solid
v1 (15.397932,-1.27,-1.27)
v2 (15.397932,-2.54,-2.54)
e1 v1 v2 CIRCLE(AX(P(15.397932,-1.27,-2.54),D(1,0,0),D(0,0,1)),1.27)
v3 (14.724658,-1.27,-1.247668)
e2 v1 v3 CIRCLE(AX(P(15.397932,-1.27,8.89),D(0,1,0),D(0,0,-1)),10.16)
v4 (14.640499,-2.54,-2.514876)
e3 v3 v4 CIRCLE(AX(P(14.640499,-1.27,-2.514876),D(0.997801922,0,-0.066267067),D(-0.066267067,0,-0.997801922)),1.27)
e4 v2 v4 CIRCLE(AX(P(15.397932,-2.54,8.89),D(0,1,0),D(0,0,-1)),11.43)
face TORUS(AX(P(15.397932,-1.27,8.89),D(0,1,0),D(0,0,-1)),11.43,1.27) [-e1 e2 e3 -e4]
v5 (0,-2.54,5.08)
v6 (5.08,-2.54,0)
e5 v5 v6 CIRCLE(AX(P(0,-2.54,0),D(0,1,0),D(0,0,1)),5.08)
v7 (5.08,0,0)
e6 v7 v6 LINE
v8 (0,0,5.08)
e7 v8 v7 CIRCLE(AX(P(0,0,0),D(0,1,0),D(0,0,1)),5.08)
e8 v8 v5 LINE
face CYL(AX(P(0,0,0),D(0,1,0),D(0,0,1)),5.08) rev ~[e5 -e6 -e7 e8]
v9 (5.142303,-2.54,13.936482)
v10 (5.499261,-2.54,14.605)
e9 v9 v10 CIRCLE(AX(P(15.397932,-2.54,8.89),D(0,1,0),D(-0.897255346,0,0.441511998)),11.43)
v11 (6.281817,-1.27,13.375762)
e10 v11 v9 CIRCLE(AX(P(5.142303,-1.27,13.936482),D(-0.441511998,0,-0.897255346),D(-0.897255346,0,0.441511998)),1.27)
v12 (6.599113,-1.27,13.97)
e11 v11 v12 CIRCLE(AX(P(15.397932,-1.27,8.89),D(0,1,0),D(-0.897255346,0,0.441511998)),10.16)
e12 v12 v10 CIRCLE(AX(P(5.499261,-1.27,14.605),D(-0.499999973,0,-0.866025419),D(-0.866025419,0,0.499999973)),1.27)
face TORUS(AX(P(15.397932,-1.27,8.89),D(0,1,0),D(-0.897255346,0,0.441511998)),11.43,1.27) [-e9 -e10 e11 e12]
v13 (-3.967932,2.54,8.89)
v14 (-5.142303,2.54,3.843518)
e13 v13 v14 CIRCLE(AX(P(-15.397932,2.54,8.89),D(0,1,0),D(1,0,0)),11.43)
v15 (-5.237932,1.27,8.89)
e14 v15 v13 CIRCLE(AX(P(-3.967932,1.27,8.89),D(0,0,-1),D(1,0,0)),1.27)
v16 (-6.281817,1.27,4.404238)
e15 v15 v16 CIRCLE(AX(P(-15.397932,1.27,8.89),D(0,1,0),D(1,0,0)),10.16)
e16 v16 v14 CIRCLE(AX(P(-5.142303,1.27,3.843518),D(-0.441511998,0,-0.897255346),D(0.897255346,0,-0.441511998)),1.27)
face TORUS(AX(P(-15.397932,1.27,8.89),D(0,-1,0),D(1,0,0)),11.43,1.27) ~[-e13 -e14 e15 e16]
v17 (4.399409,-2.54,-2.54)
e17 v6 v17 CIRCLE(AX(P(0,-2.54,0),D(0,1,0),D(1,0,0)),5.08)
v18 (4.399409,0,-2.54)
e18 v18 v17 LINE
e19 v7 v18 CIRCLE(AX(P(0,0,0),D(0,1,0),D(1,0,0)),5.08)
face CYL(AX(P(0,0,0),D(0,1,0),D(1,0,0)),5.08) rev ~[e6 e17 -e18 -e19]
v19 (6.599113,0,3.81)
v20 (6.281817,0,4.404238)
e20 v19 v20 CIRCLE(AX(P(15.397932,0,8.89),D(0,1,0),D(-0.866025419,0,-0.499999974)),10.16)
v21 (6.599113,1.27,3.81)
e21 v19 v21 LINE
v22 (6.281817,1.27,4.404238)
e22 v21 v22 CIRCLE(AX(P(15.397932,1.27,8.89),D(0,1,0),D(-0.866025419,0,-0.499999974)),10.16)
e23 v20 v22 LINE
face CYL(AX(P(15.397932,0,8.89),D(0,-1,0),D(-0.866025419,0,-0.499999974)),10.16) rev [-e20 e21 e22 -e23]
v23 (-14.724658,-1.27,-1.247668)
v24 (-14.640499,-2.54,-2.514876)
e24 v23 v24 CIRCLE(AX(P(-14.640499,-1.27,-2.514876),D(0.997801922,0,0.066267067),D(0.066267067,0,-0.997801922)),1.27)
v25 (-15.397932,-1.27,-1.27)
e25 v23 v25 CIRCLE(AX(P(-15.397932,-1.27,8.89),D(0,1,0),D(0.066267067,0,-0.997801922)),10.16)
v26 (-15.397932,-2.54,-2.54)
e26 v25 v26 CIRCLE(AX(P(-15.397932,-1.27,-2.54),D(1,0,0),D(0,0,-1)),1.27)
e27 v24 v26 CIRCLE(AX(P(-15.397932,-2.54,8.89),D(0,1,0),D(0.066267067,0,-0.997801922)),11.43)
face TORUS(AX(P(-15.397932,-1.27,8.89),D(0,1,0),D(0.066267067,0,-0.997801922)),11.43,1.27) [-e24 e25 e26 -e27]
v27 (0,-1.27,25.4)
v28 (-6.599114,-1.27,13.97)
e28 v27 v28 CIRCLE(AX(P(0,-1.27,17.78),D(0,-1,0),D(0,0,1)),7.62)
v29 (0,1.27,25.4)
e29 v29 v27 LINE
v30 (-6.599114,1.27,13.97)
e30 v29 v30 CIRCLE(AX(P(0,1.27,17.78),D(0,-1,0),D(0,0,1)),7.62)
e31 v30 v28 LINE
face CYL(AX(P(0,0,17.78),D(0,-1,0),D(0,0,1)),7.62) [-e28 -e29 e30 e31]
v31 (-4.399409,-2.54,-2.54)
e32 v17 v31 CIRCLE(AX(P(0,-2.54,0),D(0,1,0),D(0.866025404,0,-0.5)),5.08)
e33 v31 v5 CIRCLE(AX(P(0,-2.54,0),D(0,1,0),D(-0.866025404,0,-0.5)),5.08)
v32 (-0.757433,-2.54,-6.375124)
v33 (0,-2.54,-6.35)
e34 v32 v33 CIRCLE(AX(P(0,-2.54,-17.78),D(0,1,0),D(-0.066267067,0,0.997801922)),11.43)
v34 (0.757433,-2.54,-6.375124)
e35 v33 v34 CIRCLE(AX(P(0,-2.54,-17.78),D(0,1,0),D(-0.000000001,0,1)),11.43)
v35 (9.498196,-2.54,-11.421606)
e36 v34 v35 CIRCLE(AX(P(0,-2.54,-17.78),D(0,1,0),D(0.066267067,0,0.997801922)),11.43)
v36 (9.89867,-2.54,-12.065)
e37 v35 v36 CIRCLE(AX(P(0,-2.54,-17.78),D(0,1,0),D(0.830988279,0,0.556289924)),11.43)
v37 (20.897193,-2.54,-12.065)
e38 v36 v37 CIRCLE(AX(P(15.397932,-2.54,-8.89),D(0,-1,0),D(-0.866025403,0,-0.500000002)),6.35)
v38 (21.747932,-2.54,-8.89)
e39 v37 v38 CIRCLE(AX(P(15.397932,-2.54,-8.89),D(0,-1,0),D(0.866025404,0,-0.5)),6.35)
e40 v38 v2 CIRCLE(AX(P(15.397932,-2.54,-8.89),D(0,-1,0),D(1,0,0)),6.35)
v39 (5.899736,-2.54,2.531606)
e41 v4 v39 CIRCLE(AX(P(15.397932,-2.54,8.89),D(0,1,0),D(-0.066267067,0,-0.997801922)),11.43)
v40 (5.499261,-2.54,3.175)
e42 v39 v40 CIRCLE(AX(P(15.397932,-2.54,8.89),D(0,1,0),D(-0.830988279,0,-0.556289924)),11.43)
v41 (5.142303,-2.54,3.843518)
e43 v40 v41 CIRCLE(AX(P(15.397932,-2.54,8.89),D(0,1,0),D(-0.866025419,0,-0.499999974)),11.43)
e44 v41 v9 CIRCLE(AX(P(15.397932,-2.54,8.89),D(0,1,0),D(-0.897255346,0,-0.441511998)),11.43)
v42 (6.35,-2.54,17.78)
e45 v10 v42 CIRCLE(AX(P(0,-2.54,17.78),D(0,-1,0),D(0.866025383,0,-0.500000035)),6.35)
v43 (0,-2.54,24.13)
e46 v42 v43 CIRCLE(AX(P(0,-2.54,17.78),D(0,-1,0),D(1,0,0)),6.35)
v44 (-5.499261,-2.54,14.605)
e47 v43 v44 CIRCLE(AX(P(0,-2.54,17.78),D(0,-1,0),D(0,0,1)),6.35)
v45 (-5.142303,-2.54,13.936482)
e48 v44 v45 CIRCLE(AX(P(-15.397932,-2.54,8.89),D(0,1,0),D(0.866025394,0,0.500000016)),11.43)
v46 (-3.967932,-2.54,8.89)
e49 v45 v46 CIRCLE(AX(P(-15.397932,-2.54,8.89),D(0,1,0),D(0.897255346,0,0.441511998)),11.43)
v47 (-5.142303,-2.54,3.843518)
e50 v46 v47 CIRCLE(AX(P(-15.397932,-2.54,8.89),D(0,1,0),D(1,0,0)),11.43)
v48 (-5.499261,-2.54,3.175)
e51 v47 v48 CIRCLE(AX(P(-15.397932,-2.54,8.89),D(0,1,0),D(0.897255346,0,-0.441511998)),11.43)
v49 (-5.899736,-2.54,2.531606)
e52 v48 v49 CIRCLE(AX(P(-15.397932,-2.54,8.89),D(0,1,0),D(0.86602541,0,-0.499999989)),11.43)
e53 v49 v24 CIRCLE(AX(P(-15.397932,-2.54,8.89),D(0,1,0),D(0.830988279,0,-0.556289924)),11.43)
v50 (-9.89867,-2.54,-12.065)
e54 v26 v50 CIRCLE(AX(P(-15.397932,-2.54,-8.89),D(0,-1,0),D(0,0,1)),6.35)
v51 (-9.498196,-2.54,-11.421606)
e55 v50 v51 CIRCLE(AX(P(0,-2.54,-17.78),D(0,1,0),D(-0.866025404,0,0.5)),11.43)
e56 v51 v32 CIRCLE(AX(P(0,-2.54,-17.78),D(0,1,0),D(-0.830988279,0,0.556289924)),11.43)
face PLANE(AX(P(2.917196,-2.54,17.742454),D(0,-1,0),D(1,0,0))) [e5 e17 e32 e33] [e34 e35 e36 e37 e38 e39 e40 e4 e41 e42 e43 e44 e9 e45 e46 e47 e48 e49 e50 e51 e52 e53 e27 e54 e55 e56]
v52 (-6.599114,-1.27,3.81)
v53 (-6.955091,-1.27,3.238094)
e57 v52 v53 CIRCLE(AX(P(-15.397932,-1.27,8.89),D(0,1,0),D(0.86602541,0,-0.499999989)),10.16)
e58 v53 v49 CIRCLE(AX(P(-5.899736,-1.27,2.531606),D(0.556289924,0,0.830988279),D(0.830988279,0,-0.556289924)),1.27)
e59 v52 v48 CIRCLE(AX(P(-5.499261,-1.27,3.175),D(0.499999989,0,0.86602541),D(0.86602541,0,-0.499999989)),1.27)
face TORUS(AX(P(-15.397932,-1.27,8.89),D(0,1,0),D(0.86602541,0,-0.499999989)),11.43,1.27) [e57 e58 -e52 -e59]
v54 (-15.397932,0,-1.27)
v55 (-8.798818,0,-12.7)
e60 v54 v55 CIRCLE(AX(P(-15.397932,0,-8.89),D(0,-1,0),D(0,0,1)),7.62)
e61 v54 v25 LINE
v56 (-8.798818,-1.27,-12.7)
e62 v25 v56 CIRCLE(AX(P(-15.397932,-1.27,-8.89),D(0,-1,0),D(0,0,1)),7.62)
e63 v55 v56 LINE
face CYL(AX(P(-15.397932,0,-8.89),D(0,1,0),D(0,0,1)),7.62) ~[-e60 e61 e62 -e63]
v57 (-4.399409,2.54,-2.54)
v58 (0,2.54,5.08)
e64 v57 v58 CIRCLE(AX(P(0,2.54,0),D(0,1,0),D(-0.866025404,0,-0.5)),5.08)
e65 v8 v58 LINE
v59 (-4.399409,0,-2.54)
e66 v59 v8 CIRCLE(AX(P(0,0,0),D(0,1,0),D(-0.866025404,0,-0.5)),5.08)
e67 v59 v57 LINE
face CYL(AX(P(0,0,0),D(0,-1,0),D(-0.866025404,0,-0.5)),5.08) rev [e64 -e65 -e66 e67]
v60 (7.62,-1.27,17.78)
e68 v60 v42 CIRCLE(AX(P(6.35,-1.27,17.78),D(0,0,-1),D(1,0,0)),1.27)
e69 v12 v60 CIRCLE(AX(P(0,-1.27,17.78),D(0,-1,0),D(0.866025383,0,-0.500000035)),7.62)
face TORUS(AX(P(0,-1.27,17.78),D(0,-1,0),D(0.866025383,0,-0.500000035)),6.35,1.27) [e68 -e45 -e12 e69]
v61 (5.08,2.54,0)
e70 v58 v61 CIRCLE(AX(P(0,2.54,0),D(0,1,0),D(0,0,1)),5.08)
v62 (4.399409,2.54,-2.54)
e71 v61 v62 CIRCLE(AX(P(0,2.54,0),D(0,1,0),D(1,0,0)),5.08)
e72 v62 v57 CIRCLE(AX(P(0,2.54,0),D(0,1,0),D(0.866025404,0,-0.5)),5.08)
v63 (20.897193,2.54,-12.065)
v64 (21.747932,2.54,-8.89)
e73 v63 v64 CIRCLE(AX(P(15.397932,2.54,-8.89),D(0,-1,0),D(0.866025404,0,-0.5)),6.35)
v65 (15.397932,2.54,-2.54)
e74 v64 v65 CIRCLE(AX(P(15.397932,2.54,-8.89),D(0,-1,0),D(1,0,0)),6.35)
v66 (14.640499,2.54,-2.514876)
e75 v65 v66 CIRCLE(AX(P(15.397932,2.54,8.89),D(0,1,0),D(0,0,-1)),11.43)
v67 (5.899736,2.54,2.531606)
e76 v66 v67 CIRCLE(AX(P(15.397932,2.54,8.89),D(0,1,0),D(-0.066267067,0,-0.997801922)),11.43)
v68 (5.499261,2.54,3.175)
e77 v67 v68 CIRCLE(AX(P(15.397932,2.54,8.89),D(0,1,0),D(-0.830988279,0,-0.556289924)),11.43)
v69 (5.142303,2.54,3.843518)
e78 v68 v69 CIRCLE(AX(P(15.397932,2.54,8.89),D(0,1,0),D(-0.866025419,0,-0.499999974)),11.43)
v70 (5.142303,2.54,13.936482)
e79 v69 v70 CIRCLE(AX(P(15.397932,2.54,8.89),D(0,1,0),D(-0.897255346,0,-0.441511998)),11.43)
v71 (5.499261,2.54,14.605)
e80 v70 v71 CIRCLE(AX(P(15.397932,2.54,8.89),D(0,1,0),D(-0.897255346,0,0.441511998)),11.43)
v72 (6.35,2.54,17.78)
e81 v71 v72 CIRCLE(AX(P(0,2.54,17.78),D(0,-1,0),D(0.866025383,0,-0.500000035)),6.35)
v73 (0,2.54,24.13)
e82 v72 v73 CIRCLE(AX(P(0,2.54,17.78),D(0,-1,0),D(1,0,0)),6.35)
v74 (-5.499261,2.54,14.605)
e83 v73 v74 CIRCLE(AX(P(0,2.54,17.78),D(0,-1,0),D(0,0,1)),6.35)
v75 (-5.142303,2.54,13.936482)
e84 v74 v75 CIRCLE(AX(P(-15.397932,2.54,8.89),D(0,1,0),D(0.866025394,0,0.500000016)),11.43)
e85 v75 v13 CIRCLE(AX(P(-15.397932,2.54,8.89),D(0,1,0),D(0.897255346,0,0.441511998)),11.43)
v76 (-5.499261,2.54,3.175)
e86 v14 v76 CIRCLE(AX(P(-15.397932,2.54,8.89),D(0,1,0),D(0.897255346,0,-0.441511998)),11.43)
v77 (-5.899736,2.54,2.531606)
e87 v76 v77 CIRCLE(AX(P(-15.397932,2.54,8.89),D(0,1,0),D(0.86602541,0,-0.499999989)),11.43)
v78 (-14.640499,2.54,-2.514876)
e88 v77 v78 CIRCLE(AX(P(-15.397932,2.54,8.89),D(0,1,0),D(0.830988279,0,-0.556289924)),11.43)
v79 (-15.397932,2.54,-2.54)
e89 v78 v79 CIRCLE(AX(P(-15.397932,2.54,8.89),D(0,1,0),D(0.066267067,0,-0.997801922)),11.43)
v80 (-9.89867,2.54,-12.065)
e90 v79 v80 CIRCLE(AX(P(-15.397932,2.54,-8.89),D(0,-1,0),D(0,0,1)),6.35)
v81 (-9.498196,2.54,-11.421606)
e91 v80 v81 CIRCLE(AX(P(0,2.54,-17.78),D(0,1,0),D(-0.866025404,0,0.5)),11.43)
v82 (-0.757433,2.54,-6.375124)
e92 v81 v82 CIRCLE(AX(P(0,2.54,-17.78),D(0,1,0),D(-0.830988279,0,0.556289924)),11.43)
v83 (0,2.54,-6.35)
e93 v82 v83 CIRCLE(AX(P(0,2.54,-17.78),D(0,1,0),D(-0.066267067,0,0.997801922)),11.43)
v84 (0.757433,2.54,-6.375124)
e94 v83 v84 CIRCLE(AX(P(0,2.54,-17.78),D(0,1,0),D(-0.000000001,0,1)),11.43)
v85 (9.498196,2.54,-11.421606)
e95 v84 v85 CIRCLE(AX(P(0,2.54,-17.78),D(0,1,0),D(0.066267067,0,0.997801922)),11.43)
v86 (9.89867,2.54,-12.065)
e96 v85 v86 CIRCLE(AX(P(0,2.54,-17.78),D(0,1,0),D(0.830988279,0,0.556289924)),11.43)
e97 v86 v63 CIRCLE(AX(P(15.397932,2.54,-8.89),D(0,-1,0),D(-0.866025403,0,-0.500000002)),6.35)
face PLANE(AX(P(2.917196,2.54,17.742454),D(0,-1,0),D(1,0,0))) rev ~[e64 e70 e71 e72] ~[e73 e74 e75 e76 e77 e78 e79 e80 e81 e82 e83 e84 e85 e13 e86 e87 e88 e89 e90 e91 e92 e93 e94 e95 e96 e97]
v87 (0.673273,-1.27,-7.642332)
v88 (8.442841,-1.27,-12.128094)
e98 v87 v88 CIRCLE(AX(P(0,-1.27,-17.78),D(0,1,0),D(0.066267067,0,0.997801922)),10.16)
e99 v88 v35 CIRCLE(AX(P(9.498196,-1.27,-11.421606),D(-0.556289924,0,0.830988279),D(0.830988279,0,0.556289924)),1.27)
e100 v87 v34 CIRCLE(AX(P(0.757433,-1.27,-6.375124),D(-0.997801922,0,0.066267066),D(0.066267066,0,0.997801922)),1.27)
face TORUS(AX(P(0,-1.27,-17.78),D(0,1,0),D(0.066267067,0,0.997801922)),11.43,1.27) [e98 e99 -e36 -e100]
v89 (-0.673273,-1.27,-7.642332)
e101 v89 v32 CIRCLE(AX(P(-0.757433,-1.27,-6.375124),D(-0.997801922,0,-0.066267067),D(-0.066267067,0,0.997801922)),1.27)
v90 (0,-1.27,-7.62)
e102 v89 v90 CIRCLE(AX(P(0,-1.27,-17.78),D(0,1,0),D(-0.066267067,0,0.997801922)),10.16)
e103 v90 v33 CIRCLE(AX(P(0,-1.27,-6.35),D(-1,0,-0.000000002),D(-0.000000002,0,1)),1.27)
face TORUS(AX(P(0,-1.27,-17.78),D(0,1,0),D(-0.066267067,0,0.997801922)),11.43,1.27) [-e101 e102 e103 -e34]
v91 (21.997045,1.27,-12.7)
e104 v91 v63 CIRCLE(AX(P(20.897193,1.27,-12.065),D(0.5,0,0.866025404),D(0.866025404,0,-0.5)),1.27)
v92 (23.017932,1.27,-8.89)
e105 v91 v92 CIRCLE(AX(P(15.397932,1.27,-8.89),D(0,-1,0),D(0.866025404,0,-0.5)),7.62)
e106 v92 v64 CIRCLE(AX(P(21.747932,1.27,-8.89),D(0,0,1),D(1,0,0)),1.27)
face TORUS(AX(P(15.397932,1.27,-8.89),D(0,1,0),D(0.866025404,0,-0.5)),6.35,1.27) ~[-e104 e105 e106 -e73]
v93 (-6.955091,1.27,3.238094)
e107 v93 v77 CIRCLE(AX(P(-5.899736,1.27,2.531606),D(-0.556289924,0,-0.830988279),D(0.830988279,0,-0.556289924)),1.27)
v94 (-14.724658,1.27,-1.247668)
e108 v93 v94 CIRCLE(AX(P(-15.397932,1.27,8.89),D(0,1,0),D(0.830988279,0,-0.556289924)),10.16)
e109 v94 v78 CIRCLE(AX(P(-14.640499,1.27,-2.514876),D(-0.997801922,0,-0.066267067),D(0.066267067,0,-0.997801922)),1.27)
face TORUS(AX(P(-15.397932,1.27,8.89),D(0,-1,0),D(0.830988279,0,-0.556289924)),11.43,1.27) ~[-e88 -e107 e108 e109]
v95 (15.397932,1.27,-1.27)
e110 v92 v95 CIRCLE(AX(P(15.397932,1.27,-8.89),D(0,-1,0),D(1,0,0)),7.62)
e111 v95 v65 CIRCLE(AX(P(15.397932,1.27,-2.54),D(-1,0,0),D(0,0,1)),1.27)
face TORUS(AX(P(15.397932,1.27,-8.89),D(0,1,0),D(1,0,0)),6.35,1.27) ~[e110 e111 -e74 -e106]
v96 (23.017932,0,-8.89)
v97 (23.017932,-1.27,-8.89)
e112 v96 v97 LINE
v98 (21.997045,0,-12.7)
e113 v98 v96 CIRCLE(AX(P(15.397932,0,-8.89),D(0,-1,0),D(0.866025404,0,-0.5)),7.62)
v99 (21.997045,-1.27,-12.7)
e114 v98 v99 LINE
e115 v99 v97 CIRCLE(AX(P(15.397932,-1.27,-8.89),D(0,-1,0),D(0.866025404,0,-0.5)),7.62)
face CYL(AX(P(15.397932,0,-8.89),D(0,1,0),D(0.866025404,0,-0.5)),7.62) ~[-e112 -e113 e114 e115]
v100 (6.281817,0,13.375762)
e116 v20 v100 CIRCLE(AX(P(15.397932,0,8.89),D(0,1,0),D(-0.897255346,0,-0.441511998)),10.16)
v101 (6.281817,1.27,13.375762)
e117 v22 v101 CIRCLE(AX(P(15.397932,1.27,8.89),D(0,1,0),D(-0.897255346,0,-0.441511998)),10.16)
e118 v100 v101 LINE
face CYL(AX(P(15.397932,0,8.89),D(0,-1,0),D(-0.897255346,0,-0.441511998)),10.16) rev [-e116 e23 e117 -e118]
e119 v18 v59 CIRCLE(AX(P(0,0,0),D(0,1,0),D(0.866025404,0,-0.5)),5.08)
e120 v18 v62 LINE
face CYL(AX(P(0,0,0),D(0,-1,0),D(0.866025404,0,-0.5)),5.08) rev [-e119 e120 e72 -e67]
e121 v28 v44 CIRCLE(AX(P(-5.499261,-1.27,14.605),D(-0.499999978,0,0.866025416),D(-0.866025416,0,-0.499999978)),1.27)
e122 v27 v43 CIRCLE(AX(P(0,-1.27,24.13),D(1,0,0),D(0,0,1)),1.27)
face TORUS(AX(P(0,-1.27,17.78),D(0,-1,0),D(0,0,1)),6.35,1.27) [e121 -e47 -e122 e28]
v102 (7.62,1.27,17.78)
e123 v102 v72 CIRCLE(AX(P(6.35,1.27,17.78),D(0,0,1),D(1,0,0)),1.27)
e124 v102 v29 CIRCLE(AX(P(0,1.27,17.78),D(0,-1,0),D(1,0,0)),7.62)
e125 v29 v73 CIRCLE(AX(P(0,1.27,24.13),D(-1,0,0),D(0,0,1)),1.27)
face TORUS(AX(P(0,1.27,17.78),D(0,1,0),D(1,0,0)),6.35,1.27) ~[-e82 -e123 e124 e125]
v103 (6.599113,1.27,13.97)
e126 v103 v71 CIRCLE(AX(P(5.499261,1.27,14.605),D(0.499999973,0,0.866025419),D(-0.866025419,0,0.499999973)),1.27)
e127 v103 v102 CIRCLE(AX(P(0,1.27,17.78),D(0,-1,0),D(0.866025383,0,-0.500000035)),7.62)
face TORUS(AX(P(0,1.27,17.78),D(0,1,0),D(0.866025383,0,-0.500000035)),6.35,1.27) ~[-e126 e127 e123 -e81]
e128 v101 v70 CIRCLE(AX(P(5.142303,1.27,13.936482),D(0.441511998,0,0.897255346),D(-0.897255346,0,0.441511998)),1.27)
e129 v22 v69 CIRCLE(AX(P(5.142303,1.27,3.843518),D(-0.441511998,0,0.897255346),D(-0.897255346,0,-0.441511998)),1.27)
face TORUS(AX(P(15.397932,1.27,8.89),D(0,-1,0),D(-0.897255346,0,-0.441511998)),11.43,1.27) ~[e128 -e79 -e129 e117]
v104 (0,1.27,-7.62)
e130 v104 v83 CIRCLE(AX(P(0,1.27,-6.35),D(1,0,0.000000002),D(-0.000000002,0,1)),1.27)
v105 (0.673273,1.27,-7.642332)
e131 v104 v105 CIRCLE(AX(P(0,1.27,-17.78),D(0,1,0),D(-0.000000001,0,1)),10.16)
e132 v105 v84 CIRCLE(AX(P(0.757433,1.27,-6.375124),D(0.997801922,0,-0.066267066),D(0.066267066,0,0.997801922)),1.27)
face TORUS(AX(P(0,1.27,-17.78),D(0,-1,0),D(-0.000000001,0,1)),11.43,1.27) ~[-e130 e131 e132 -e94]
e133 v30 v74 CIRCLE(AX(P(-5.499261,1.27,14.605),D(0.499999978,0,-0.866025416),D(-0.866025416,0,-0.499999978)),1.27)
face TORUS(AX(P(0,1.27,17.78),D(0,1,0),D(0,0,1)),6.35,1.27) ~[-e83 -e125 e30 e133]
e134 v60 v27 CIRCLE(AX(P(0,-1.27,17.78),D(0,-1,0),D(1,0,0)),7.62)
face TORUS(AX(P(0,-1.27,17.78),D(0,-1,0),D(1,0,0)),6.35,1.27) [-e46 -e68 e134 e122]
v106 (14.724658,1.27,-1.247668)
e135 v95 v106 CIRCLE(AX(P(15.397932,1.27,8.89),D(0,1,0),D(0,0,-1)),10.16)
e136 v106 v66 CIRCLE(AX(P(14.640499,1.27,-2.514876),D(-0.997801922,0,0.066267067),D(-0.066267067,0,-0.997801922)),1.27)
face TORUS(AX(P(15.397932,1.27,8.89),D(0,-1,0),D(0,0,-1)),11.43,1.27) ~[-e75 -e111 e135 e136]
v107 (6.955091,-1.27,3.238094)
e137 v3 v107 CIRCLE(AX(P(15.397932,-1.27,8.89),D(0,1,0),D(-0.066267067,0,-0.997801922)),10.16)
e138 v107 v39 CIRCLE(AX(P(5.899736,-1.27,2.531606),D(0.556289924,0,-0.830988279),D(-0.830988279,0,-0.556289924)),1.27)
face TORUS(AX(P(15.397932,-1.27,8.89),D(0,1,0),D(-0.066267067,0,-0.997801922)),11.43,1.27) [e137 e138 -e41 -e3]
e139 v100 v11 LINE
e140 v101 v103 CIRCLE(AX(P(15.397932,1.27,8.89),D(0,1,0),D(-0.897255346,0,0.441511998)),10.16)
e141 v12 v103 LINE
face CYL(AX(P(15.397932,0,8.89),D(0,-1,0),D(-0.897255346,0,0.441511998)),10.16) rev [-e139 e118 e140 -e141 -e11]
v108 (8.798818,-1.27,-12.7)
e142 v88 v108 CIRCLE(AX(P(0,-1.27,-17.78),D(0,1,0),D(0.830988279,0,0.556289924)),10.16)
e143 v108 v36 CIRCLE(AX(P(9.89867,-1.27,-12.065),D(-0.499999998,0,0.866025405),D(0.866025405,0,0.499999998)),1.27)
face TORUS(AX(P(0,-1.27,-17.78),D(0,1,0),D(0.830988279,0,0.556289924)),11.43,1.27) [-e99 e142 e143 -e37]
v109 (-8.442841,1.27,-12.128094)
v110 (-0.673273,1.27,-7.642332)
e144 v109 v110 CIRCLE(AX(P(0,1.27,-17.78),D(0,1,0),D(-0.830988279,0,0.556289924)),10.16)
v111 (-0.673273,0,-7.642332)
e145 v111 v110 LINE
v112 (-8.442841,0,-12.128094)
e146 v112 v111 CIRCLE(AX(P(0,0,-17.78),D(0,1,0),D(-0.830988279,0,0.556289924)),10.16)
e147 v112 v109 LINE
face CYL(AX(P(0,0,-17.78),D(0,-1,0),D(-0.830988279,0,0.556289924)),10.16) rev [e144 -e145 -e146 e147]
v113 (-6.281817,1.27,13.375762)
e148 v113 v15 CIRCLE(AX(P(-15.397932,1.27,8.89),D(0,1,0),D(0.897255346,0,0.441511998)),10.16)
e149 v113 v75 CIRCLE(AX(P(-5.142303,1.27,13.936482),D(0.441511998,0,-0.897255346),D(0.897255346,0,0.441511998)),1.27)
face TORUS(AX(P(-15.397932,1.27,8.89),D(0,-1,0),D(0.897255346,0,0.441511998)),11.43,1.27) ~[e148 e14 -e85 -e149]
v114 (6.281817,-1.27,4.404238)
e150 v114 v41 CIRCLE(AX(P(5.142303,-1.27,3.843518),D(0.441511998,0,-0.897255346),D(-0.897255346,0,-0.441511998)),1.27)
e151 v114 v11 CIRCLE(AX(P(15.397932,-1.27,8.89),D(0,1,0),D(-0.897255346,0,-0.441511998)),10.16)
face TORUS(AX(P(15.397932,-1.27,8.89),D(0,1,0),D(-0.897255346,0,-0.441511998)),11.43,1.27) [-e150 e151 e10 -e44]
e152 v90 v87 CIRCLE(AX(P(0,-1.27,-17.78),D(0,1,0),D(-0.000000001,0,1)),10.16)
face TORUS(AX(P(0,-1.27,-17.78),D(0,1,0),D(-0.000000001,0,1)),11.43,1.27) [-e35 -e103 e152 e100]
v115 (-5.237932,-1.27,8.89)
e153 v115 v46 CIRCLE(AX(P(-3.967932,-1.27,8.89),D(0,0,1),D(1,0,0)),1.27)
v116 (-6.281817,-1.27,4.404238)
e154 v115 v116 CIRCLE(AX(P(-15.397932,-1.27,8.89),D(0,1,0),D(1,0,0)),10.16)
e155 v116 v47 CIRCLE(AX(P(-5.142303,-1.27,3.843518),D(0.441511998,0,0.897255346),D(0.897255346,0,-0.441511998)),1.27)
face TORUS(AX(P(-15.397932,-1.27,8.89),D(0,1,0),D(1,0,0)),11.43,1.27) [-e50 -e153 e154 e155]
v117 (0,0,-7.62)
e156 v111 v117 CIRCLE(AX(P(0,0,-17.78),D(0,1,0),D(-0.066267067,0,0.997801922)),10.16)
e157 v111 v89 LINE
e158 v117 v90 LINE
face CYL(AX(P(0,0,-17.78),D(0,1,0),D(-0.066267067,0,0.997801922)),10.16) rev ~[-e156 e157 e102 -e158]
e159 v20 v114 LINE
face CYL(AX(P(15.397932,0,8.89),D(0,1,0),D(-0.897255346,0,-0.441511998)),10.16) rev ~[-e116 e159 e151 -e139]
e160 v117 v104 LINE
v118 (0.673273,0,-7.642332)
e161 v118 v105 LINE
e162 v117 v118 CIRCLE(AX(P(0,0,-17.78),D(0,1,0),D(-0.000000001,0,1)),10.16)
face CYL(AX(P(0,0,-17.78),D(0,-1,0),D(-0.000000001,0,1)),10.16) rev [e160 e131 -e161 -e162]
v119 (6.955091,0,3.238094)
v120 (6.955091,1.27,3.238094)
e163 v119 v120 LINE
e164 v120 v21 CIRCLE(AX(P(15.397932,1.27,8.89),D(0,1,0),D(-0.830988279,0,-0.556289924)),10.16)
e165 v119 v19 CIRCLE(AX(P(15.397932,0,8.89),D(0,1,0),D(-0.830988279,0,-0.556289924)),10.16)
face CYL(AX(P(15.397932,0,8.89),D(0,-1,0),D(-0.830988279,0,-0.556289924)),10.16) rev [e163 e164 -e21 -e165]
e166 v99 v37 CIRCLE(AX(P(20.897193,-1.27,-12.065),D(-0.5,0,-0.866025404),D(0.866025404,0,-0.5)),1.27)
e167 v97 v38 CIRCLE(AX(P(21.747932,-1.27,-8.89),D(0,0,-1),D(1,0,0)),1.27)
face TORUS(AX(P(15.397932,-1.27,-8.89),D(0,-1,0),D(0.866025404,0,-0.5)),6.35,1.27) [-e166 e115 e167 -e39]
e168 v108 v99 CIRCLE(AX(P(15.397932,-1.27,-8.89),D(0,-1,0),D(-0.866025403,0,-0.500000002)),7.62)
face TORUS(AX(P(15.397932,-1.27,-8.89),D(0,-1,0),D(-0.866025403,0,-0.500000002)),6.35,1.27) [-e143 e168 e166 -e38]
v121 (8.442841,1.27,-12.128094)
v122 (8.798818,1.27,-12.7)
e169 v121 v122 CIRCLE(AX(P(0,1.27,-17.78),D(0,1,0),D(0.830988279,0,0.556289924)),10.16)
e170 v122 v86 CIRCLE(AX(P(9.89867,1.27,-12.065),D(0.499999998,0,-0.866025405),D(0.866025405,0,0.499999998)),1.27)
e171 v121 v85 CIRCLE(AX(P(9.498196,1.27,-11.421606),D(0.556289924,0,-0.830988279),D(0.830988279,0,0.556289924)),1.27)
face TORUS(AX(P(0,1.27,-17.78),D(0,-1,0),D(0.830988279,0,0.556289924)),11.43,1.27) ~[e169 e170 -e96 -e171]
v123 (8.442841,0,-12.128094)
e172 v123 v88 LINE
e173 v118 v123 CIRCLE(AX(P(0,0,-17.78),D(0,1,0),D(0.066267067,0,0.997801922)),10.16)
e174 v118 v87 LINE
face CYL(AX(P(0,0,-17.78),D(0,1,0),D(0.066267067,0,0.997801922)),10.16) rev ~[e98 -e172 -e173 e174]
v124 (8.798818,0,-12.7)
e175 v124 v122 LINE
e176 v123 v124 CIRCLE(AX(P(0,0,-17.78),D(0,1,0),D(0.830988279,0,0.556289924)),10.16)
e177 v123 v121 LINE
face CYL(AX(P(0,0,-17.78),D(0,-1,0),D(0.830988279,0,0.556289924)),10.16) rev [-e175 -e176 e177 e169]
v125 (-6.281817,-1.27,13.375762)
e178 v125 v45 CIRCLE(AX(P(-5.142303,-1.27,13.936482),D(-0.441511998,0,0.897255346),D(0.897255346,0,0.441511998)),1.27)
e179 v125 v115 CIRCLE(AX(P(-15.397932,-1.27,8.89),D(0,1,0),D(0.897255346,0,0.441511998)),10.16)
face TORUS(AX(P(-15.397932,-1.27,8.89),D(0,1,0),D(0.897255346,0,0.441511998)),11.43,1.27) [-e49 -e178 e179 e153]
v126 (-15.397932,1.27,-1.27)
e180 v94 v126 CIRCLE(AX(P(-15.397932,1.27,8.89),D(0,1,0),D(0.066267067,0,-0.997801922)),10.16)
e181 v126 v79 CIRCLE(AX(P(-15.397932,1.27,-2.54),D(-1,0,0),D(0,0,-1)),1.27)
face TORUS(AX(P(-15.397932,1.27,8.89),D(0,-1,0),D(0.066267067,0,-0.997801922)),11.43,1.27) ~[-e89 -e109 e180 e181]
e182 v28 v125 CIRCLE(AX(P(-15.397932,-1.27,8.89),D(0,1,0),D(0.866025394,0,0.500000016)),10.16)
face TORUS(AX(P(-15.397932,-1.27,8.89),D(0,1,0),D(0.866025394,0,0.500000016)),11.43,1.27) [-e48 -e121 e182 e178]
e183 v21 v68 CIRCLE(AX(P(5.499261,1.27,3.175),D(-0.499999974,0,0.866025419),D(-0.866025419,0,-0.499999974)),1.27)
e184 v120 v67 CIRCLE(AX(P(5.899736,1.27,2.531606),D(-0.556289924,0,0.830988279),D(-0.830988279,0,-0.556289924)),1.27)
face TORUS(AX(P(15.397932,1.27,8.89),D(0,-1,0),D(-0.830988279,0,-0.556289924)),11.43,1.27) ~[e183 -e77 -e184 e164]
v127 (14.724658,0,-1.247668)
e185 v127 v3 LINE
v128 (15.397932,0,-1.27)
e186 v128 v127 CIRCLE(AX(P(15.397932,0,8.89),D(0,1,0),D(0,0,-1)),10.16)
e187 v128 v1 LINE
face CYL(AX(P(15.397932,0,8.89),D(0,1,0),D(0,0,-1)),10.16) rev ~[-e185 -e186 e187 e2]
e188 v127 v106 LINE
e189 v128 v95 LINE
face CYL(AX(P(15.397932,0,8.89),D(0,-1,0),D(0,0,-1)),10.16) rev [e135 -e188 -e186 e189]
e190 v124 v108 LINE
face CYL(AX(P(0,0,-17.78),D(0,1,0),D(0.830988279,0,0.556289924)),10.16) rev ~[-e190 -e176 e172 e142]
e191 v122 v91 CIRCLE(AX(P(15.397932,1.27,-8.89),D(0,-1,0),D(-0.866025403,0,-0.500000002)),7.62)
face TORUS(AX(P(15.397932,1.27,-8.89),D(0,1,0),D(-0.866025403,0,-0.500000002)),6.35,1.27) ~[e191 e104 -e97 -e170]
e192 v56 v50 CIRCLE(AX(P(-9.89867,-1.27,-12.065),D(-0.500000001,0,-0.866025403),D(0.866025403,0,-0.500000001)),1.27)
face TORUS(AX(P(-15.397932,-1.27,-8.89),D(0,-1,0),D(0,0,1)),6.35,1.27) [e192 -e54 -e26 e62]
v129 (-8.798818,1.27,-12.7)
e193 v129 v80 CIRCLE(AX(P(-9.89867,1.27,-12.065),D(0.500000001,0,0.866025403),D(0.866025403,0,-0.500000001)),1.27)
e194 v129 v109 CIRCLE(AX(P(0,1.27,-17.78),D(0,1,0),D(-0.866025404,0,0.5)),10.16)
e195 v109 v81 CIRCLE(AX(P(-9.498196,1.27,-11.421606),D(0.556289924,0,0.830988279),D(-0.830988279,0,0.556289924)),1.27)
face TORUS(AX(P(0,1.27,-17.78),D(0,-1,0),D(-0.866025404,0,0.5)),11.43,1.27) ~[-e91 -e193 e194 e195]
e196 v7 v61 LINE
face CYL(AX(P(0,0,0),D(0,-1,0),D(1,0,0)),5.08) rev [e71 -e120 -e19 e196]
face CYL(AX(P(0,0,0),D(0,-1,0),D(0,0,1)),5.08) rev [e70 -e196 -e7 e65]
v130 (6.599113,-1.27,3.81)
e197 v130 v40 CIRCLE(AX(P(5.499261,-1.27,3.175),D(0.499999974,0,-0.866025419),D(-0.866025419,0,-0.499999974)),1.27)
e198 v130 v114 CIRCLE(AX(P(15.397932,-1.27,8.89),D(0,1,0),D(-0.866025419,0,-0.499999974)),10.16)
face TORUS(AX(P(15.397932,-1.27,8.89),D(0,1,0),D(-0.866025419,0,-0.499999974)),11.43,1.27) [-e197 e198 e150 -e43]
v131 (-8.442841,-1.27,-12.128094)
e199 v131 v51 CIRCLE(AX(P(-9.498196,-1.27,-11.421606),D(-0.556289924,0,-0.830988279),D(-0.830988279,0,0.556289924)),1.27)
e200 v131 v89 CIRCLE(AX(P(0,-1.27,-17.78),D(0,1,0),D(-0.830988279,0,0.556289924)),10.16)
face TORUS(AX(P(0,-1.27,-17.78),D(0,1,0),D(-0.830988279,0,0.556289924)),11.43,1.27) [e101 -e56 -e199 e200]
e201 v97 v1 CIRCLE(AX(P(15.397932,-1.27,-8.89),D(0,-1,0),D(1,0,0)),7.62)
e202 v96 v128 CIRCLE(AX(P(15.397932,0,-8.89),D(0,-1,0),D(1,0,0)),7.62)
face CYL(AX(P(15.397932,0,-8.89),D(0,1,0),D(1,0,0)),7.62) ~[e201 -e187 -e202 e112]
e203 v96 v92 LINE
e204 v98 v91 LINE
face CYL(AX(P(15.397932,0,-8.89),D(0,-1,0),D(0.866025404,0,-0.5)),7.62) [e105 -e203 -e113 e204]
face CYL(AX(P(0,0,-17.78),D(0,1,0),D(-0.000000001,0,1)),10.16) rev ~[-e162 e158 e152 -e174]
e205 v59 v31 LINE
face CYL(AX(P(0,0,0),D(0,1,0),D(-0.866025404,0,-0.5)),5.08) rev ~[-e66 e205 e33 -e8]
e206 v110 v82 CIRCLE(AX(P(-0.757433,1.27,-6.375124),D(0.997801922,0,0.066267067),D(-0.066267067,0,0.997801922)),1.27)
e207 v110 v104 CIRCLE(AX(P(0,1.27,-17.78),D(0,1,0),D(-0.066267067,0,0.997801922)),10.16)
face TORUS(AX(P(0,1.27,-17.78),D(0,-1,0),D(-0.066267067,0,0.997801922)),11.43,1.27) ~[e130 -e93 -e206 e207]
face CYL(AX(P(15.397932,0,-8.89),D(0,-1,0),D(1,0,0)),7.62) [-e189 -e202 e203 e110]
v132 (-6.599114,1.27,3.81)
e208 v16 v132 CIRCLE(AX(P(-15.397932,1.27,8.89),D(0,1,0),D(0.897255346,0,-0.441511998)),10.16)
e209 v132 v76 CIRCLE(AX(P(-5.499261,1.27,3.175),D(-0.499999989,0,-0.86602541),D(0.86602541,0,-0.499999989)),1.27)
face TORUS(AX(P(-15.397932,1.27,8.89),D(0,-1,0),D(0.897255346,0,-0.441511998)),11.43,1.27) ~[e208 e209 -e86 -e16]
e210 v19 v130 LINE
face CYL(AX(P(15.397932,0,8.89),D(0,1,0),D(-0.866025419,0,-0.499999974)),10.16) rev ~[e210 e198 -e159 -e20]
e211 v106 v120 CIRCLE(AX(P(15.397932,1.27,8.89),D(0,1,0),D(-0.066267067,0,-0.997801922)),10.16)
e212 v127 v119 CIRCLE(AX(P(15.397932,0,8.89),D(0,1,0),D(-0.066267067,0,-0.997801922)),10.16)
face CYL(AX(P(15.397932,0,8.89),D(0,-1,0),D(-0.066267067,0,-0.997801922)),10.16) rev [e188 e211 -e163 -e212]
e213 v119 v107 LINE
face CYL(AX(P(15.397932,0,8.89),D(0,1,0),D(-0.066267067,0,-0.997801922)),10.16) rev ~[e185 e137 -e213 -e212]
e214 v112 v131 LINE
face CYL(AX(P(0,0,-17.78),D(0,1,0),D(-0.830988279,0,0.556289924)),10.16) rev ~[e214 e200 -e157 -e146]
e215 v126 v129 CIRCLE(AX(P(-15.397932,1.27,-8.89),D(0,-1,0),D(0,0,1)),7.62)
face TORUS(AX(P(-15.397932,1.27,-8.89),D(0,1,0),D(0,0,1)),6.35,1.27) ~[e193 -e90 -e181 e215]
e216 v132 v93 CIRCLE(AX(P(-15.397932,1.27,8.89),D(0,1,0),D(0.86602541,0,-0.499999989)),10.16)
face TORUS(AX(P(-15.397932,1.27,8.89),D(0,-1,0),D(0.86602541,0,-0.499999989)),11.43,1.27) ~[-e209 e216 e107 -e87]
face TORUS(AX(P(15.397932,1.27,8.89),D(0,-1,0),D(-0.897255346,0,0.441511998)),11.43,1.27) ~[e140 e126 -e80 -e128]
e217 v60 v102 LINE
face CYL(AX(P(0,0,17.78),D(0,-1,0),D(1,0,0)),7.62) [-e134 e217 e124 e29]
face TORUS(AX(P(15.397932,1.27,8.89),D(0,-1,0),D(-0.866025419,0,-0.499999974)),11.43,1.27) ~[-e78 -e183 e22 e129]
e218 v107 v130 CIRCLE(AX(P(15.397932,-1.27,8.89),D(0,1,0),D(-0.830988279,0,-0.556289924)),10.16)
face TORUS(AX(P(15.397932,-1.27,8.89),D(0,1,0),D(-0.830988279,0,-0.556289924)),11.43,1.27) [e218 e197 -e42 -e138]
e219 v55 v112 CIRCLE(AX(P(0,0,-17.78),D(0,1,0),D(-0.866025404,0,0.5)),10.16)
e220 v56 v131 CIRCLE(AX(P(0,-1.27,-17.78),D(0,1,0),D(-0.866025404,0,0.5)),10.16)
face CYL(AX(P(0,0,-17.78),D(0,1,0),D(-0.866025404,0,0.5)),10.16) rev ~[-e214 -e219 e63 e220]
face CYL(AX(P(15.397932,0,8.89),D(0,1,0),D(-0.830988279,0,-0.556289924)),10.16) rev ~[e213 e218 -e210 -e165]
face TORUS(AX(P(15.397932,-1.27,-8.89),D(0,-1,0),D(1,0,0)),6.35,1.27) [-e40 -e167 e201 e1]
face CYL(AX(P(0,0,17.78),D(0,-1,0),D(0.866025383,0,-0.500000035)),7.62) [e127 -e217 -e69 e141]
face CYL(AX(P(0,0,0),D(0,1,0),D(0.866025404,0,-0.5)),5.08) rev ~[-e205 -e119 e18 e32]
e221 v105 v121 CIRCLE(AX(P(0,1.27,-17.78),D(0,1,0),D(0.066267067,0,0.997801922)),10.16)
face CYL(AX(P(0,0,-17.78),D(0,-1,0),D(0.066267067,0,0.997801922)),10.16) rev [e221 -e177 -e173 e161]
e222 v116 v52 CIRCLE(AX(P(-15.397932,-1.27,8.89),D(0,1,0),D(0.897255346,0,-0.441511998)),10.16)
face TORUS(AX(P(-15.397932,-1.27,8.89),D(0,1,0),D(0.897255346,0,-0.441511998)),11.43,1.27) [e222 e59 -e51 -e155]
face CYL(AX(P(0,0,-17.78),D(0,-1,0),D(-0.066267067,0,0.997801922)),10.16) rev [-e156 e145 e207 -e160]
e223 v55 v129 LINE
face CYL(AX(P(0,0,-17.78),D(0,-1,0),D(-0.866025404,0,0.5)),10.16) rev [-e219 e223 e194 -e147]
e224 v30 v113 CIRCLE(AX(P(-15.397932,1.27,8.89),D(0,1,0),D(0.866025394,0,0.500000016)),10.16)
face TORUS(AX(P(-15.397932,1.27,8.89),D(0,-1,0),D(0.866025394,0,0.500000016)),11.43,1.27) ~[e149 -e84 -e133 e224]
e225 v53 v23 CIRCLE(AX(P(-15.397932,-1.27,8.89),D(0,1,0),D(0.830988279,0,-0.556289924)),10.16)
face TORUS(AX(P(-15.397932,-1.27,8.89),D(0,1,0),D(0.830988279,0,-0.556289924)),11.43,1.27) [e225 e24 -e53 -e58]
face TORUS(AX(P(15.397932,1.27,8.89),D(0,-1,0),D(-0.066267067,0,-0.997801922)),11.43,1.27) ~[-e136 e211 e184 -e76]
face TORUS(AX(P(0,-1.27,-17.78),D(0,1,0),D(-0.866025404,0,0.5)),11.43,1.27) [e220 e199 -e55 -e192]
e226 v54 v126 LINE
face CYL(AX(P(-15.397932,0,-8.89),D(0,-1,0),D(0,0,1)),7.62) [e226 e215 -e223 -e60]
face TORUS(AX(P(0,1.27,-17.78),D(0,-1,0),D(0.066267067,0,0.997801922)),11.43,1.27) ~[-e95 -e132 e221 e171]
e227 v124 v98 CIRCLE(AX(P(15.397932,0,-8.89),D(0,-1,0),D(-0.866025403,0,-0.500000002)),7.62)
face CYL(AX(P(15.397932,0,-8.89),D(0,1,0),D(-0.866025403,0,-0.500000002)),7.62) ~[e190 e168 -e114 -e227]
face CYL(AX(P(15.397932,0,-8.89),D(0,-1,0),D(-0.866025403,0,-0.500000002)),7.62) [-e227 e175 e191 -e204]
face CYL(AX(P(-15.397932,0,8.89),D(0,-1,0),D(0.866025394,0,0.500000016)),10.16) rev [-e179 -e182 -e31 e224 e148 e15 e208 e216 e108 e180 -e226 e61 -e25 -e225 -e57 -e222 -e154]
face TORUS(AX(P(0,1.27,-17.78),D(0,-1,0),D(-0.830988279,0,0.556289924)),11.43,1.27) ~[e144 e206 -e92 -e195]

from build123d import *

# Parameters (mm, degrees)
F1_DEPTH = 2.54
F2_R     = 1.27


# Not quite as in the source:
# - a feature names something its author has since deleted; it is built from what else it names


with BuildPart() as f1:
    # F0 (on Front) → F1 (new body, symmetric)
    with BuildSketch(Plane.XZ):
        with BuildLine():
            ThreePointArc((7.62, 17.78), (5.3881536726, 23.1681536726), (0, 25.4))
            Line((0, 25.4), (0, 10.16))
            ThreePointArc((0, 10.16), (3.249178877, 10.887450644), (5.877985768, 12.9309090222))
            ThreePointArc((5.877985768, 12.9309090222), (6.260146038, 13.4354664712), (6.5991134209, 13.96999973))
            ThreePointArc((6.5991134209, 13.96999973), (7.360354756, 15.8077987257), (7.62, 17.78))
        make_face()
        with BuildLine():
            Line((0, 10.16), (0, 25.4))
            ThreePointArc((0, 25.4), (-6.5991135286, 21.5900000836), (-6.5991136733, 13.9700001671))
            ThreePointArc((-6.5991136733, 13.9700001671), (-6.2601461875, 13.4354666866), (-5.8779857805, 12.9309090373))
            ThreePointArc((-5.8779857805, 12.9309090373), (-3.2491788858, 10.8874506481), (0, 10.16))
        make_face()
        with BuildLine():
            Line((0, 7.62), (0, 10.16))
            ThreePointArc((0, 10.16), (-3.2491788858, 10.8874506481), (-5.8779857805, 12.9309090373))
            ThreePointArc((-5.8779857805, 12.9309090373), (-4.8002366489, 11.0368765758), (-4.4263073453, 8.89))
            ThreePointArc((-4.4263073453, 8.89), (-4.8002366648, 6.74312338), (-5.8779858402, 4.8490908903))
            ThreePointArc((-5.8779858402, 4.8490908903), (-3.2491789283, 6.8925493318), (0, 7.62))
        make_face()
        with BuildLine():
            ThreePointArc((5.877985768, 12.9309090222), (3.249178877, 10.887450644), (0, 10.16))
            Line((0, 10.16), (0, 7.62))
            ThreePointArc((0, 7.62), (3.2491789453, 6.8925493238), (5.8779858642, 4.8490908613))
            ThreePointArc((5.8779858642, 4.8490908613), (4.4263073453, 8.8899999245), (5.877985768, 12.9309090222))
        make_face()
        with BuildLine():
            ThreePointArc((-14.1374887376, -1.3749694884), (-11.0533983396, -2.6298538308), (-8.7988181024, -5.08))
            Line((-8.7988181024, -5.08), (-6.5991135768, -3.81))
            ThreePointArc((-6.5991135768, -3.81), (-7.5937122775, -0.6324032306), (-7.1384288571, 2.6659395065))
            ThreePointArc((-7.1384288571, 2.6659395065), (-9.9121195778, -0.6117054319), (-14.1374887376, -1.3749694884))
        make_face()
        with BuildLine():
            Line((-6.5991135768, -3.81), (-8.7988181024, -5.08))
            ThreePointArc((-8.7988181024, -5.08), (-8.037576883, -6.9177988763), (-7.7779316793, -8.89))
            ThreePointArc((-7.7779316793, -8.89), (-7.8992908924, -10.2445428561), (-8.2595028995, -11.5559397134))
            ThreePointArc((-8.2595028995, -11.5559397134), (-5.4858122449, -8.2782946509), (-1.2604430504, -7.5150304934))
            ThreePointArc((-1.2604430504, -7.5150304934), (-4.344533385, -6.2601461378), (-6.5991135768, -3.81))
        make_face()
        with BuildLine():
            ThreePointArc((-15.3979316793, -1.27), (-21.9970452561, -5.08), (-21.9970452561, -12.7))
            Line((-21.9970452561, -12.7), (-8.7988181024, -5.08))
            ThreePointArc((-8.7988181024, -5.08), (-11.0533983396, -2.6298538308), (-14.1374887376, -1.3749694884))
            ThreePointArc((-14.1374887376, -1.3749694884), (-14.7655285241, -1.2962877162), (-15.3979316793, -1.27))
        make_face()
        with BuildLine():
            Line((-8.7988181024, -5.08), (-21.9970452561, -12.7))
            ThreePointArc((-21.9970452561, -12.7), (-15.3979316818, -16.51), (-8.7988181049, -12.7000000043))
            ThreePointArc((-8.7988181049, -12.7000000043), (-8.5053823708, -12.1391789778), (-8.2595028995, -11.5559397134))
            ThreePointArc((-8.2595028995, -11.5559397134), (-7.8992908924, -10.2445428561), (-7.7779316793, -8.89))
            ThreePointArc((-7.7779316793, -8.89), (-8.037576883, -6.9177988763), (-8.7988181024, -5.08))
        make_face()
        with BuildLine():
            ThreePointArc((1.2604429732, -7.5150305063), (4.3445333529, -6.2601461601), (6.5991135768, -3.81))
            Line((6.5991135768, -3.81), (4.3994090512, -2.54))
            ThreePointArc((4.3994090512, -2.54), (0, -5.08), (-4.3994090512, -2.54))
            Line((-4.3994090512, -2.54), (-6.5991135768, -3.81))
            ThreePointArc((-6.5991135768, -3.81), (-4.344533385, -6.2601461378), (-1.2604430504, -7.5150304934))
            ThreePointArc((-1.2604430504, -7.5150304934), (-0.6324032184, -7.5937122785), (-1.66e-08, -7.62))
            ThreePointArc((-1.66e-08, -7.62), (0.6324031628, -7.5937122832), (1.2604429732, -7.5150305063))
        make_face()
        with BuildLine():
            Line((-6.5991135768, -3.81), (-4.3994090512, -2.54))
            ThreePointArc((-4.3994090512, -2.54), (-4.3994090512, 2.54), (0, 5.08))
            Line((0, 5.08), (0, 7.62))
            ThreePointArc((0, 7.62), (-3.2491789283, 6.8925493318), (-5.8779858402, 4.8490908903))
            ThreePointArc((-5.8779858402, 4.8490908903), (-6.2601461212, 4.3445334089), (-6.5991135101, 3.8100001156))
            ThreePointArc((-6.5991135101, 3.8100001156), (-6.8925493282, 3.249178936), (-7.1384288571, 2.6659395065))
            ThreePointArc((-7.1384288571, 2.6659395065), (-7.5937122775, -0.6324032306), (-6.5991135768, -3.81))
        make_face()
        with BuildLine():
            ThreePointArc((8.2595029011, -11.5559397177), (7.8042193924, -8.2575968818), (8.7988181024, -5.08))
            Line((8.7988181024, -5.08), (6.5991135768, -3.81))
            ThreePointArc((6.5991135768, -3.81), (4.3445333529, -6.2601461601), (1.2604429732, -7.5150305063))
            ThreePointArc((1.2604429732, -7.5150305063), (5.4858122129, -8.2782946325), (8.2595029011, -11.5559397177))
        make_face()
        with BuildLine():
            Line((6.5991135768, -3.81), (8.7988181024, -5.08))
            ThreePointArc((8.7988181024, -5.08), (11.0533983038, -2.6298538556), (14.1374886517, -1.3749695028))
            ThreePointArc((14.1374886517, -1.3749695028), (9.9121195513, -0.6117054166), (7.1384288662, 2.6659394822))
            ThreePointArc((7.1384288662, 2.6659394822), (7.4986408088, 1.3545427346), (7.62, 0))
            ThreePointArc((7.62, 0), (7.3603547963, -1.9722011237), (6.5991135768, -3.81))
        make_face()
        with BuildLine():
            Line((8.7988181024, -5.08), (21.9970452561, -12.7))
            ThreePointArc((21.9970452561, -12.7), (22.7582864756, -10.8622011237), (23.0179316793, -8.89))
            ThreePointArc((23.0179316793, -8.89), (20.7860853519, -3.5018463274), (15.3979316793, -1.27))
            ThreePointArc((15.3979316793, -1.27), (14.7655284807, -1.2962877198), (14.1374886517, -1.3749695028))
            ThreePointArc((14.1374886517, -1.3749695028), (11.0533983038, -2.6298538556), (8.7988181024, -5.08))
        make_face()
        with BuildLine():
            ThreePointArc((8.7988181117, -12.700000016), (15.3979316885, -16.51), (21.9970452561, -12.7))
            Line((21.9970452561, -12.7), (8.7988181024, -5.08))
            ThreePointArc((8.7988181024, -5.08), (7.8042193924, -8.2575968818), (8.2595029011, -11.5559397177))
            ThreePointArc((8.2595029011, -11.5559397177), (8.5053823746, -12.139178986), (8.7988181117, -12.700000016))
        make_face()
        with BuildLine():
            ThreePointArc((-14.7246582835, -1.2476675293), (-14.4325799527, -1.318266846), (-14.1374887376, -1.3749694884))
            ThreePointArc((-14.1374887376, -1.3749694884), (-9.9121195778, -0.6117054319), (-7.1384288571, 2.6659395065))
            ThreePointArc((-7.1384288571, 2.6659395065), (-7.0399891484, 2.9498473861), (-6.9550907617, 3.2380943709))
            ThreePointArc((-6.9550907617, 3.2380943709), (-10.3179316793, 0.0911818976), (-14.7246582835, -1.2476675293))
        make_face()
        with BuildLine():
            Line((4.3994090512, -2.54), (6.5991135768, -3.81))
            ThreePointArc((6.5991135768, -3.81), (7.3603547963, -1.9722011237), (7.62, 0))
            ThreePointArc((7.62, 0), (7.4986408088, 1.3545427346), (7.1384288662, 2.6659394822))
            ThreePointArc((7.1384288662, 2.6659394822), (6.8925492974, 3.2491790013), (6.5991134249, 3.8100002632))
            ThreePointArc((6.5991134249, 3.8100002632), (6.2601460834, 4.3445334634), (5.8779858642, 4.8490908613))
            ThreePointArc((5.8779858642, 4.8490908613), (3.2491789453, 6.8925493238), (0, 7.62))
            Line((0, 7.62), (0, 5.08))
            ThreePointArc((0, 5.08), (3.5921024484, 3.5921024484), (5.08, 0))
            ThreePointArc((5.08, 0), (4.9069031975, -1.3148007491), (4.3994090512, -2.54))
        make_face()
        with BuildLine():
            ThreePointArc((-1.2604430504, -7.5150304934), (-5.4858122449, -8.2782946509), (-8.2595028995, -11.5559397134))
            ThreePointArc((-8.2595028995, -11.5559397134), (-8.3579425646, -11.8398474913), (-8.4428409176, -12.1280943709))
            ThreePointArc((-8.4428409176, -12.1280943709), (-5.08, -8.9811818976), (-0.6732733958, -7.6423324707))
            ThreePointArc((-0.6732733958, -7.6423324707), (-0.9653517805, -7.5717331423), (-1.2604430504, -7.5150304934))
        make_face()
        with BuildLine():
            ThreePointArc((8.4428409176, -12.1280943709), (8.3579425653, -11.8398474934), (8.2595029011, -11.5559397177))
            ThreePointArc((8.2595029011, -11.5559397177), (5.4858122129, -8.2782946325), (1.2604429732, -7.5150305063))
            ThreePointArc((1.2604429732, -7.5150305063), (0.9653517422, -7.5717331506), (0.6732733958, -7.6423324707))
            ThreePointArc((0.6732733958, -7.6423324707), (5.08, -8.9811818976), (8.4428409176, -12.1280943709))
        make_face()
        with BuildLine():
            ThreePointArc((7.1384288662, 2.6659394822), (9.9121195513, -0.6117054166), (14.1374886517, -1.3749695028))
            ThreePointArc((14.1374886517, -1.3749695028), (14.4325799101, -1.3182668553), (14.7246582835, -1.2476675293))
            ThreePointArc((14.7246582835, -1.2476675293), (10.3179316793, 0.0911818976), (6.9550907617, 3.2380943709))
            ThreePointArc((6.9550907617, 3.2380943709), (7.0399891524, 2.9498473737), (7.1384288662, 2.6659394822))
        make_face()
        with BuildLine():
            ThreePointArc((6.2818173659, 13.3757619002), (6.0746373488, 13.1581142492), (5.877985768, 12.9309090222))
            ThreePointArc((5.877985768, 12.9309090222), (4.4263073453, 8.8899999245), (5.8779858642, 4.8490908613))
            ThreePointArc((5.8779858642, 4.8490908613), (6.0746373996, 4.6218856948), (6.2818173659, 4.4042380998))
            ThreePointArc((6.2818173659, 4.4042380998), (5.2379316793, 8.89), (6.2818173659, 13.3757619002))
        make_face()
        with BuildLine():
            ThreePointArc((-4.4263073453, 8.89), (-4.8002366489, 11.0368765758), (-5.8779857805, 12.9309090373))
            ThreePointArc((-5.8779857805, 12.9309090373), (-6.0746373554, 13.1581142565), (-6.2818173659, 13.3757619002))
            ThreePointArc((-6.2818173659, 13.3757619002), (-5.5023437376, 11.1928111707), (-5.2379316793, 8.89))
            ThreePointArc((-5.2379316793, 8.89), (-5.5023437376, 6.5871888293), (-6.2818173659, 4.4042380998))
            ThreePointArc((-6.2818173659, 4.4042380998), (-6.074637387, 4.6218857087), (-5.8779858402, 4.8490908903))
            ThreePointArc((-5.8779858402, 4.8490908903), (-4.8002366648, 6.74312338), (-4.4263073453, 8.89))
        make_face()
        with BuildLine():
            ThreePointArc((-8.2595028995, -11.5559397134), (-8.5053823708, -12.1391789778), (-8.7988181049, -12.7000000043))
            ThreePointArc((-8.7988181049, -12.7000000043), (-8.6255707333, -12.4110960593), (-8.4428409176, -12.1280943709))
            ThreePointArc((-8.4428409176, -12.1280943709), (-8.3579425646, -11.8398474913), (-8.2595028995, -11.5559397134))
        make_face()
        with BuildLine():
            ThreePointArc((-0.6732733958, -7.6423324707), (-0.3368218472, -7.6255846528), (-1.66e-08, -7.62))
            ThreePointArc((-1.66e-08, -7.62), (-0.6324032184, -7.5937122785), (-1.2604430504, -7.5150304934))
            ThreePointArc((-1.2604430504, -7.5150304934), (-0.9653517805, -7.5717331423), (-0.6732733958, -7.6423324707))
        make_face()
        with BuildLine():
            ThreePointArc((0.6732733958, -7.6423324707), (0.9653517422, -7.5717331506), (1.2604429732, -7.5150305063))
            ThreePointArc((1.2604429732, -7.5150305063), (0.6324031628, -7.5937122832), (-1.66e-08, -7.62))
            ThreePointArc((-1.66e-08, -7.62), (0.3368218306, -7.6255846523), (0.6732733958, -7.6423324707))
        make_face()
        with BuildLine():
            ThreePointArc((-14.7246582835, -1.2476675293), (-15.0611098403, -1.2644153475), (-15.3979316793, -1.27))
            ThreePointArc((-15.3979316793, -1.27), (-14.7655285241, -1.2962877162), (-14.1374887376, -1.3749694884))
            ThreePointArc((-14.1374887376, -1.3749694884), (-14.4325799527, -1.318266846), (-14.7246582835, -1.2476675293))
        make_face()
        with BuildLine():
            ThreePointArc((-6.9550907617, 3.2380943709), (-7.0399891484, 2.9498473861), (-7.1384288571, 2.6659395065))
            ThreePointArc((-7.1384288571, 2.6659395065), (-6.8925493282, 3.249178936), (-6.5991135101, 3.8100001156))
            ThreePointArc((-6.5991135101, 3.8100001156), (-6.772360912, 3.5210961139), (-6.9550907617, 3.2380943709))
        make_face()
        with BuildLine():
            ThreePointArc((-6.5991135101, 3.8100001156), (-6.2601461212, 4.3445334089), (-5.8779858402, 4.8490908903))
            ThreePointArc((-5.8779858402, 4.8490908903), (-6.074637387, 4.6218857087), (-6.2818173659, 4.4042380998))
            ThreePointArc((-6.2818173659, 4.4042380998), (-6.4355390769, 4.1044886542), (-6.5991135101, 3.8100001156))
        make_face()
        with BuildLine():
            ThreePointArc((-5.8779857805, 12.9309090373), (-6.2601461875, 13.4354666866), (-6.5991136733, 13.9700001671))
            ThreePointArc((-6.5991136733, 13.9700001671), (-6.4355391538, 13.6755114898), (-6.2818173659, 13.3757619002))
            ThreePointArc((-6.2818173659, 13.3757619002), (-6.0746373554, 13.1581142565), (-5.8779857805, 12.9309090373))
        make_face()
        with BuildLine():
            ThreePointArc((6.2818173659, 13.3757619002), (6.4355390349, 13.6755112671), (6.5991134209, 13.96999973))
            ThreePointArc((6.5991134209, 13.96999973), (6.260146038, 13.4354664712), (5.877985768, 12.9309090222))
            ThreePointArc((5.877985768, 12.9309090222), (6.0746373488, 13.1581142492), (6.2818173659, 13.3757619002))
        make_face()
        with BuildLine():
            ThreePointArc((5.8779858642, 4.8490908613), (6.2601460834, 4.3445334634), (6.5991134249, 3.8100002632))
            ThreePointArc((6.5991134249, 3.8100002632), (6.4355390368, 4.1044887294), (6.2818173659, 4.4042380998))
            ThreePointArc((6.2818173659, 4.4042380998), (6.0746373996, 4.6218856948), (5.8779858642, 4.8490908613))
        make_face()
        with BuildLine():
            ThreePointArc((6.5991134249, 3.8100002632), (6.8925492974, 3.2491790013), (7.1384288662, 2.6659394822))
            ThreePointArc((7.1384288662, 2.6659394822), (7.0399891524, 2.9498473737), (6.9550907617, 3.2380943709))
            ThreePointArc((6.9550907617, 3.2380943709), (6.772360867, 3.5210961862), (6.5991134249, 3.8100002632))
        make_face()
        with BuildLine():
            ThreePointArc((14.7246582835, -1.2476675293), (14.4325799101, -1.3182668553), (14.1374886517, -1.3749695028))
            ThreePointArc((14.1374886517, -1.3749695028), (14.7655284807, -1.2962877198), (15.3979316793, -1.27))
            ThreePointArc((15.3979316793, -1.27), (15.0611098403, -1.2644153475), (14.7246582835, -1.2476675293))
        make_face()
        with BuildLine():
            ThreePointArc((8.4428409176, -12.1280943709), (8.6255707369, -12.411096065), (8.7988181117, -12.700000016))
            ThreePointArc((8.7988181117, -12.700000016), (8.5053823746, -12.139178986), (8.2595029011, -11.5559397177))
            ThreePointArc((8.2595029011, -11.5559397177), (8.3579425653, -11.8398474934), (8.4428409176, -12.1280943709))
        make_face()
    extrude(amount=F1_DEPTH, both=True)

    # F2
    f2_edges = [f1.edges().sort_by_distance(p)[0] for p in [
        (0, 2.54, -7.62),
        (6.599114, -2.54, 3.81),
    ]]
    fillet(f2_edges, radius=F2_R)


solid = f1.part
